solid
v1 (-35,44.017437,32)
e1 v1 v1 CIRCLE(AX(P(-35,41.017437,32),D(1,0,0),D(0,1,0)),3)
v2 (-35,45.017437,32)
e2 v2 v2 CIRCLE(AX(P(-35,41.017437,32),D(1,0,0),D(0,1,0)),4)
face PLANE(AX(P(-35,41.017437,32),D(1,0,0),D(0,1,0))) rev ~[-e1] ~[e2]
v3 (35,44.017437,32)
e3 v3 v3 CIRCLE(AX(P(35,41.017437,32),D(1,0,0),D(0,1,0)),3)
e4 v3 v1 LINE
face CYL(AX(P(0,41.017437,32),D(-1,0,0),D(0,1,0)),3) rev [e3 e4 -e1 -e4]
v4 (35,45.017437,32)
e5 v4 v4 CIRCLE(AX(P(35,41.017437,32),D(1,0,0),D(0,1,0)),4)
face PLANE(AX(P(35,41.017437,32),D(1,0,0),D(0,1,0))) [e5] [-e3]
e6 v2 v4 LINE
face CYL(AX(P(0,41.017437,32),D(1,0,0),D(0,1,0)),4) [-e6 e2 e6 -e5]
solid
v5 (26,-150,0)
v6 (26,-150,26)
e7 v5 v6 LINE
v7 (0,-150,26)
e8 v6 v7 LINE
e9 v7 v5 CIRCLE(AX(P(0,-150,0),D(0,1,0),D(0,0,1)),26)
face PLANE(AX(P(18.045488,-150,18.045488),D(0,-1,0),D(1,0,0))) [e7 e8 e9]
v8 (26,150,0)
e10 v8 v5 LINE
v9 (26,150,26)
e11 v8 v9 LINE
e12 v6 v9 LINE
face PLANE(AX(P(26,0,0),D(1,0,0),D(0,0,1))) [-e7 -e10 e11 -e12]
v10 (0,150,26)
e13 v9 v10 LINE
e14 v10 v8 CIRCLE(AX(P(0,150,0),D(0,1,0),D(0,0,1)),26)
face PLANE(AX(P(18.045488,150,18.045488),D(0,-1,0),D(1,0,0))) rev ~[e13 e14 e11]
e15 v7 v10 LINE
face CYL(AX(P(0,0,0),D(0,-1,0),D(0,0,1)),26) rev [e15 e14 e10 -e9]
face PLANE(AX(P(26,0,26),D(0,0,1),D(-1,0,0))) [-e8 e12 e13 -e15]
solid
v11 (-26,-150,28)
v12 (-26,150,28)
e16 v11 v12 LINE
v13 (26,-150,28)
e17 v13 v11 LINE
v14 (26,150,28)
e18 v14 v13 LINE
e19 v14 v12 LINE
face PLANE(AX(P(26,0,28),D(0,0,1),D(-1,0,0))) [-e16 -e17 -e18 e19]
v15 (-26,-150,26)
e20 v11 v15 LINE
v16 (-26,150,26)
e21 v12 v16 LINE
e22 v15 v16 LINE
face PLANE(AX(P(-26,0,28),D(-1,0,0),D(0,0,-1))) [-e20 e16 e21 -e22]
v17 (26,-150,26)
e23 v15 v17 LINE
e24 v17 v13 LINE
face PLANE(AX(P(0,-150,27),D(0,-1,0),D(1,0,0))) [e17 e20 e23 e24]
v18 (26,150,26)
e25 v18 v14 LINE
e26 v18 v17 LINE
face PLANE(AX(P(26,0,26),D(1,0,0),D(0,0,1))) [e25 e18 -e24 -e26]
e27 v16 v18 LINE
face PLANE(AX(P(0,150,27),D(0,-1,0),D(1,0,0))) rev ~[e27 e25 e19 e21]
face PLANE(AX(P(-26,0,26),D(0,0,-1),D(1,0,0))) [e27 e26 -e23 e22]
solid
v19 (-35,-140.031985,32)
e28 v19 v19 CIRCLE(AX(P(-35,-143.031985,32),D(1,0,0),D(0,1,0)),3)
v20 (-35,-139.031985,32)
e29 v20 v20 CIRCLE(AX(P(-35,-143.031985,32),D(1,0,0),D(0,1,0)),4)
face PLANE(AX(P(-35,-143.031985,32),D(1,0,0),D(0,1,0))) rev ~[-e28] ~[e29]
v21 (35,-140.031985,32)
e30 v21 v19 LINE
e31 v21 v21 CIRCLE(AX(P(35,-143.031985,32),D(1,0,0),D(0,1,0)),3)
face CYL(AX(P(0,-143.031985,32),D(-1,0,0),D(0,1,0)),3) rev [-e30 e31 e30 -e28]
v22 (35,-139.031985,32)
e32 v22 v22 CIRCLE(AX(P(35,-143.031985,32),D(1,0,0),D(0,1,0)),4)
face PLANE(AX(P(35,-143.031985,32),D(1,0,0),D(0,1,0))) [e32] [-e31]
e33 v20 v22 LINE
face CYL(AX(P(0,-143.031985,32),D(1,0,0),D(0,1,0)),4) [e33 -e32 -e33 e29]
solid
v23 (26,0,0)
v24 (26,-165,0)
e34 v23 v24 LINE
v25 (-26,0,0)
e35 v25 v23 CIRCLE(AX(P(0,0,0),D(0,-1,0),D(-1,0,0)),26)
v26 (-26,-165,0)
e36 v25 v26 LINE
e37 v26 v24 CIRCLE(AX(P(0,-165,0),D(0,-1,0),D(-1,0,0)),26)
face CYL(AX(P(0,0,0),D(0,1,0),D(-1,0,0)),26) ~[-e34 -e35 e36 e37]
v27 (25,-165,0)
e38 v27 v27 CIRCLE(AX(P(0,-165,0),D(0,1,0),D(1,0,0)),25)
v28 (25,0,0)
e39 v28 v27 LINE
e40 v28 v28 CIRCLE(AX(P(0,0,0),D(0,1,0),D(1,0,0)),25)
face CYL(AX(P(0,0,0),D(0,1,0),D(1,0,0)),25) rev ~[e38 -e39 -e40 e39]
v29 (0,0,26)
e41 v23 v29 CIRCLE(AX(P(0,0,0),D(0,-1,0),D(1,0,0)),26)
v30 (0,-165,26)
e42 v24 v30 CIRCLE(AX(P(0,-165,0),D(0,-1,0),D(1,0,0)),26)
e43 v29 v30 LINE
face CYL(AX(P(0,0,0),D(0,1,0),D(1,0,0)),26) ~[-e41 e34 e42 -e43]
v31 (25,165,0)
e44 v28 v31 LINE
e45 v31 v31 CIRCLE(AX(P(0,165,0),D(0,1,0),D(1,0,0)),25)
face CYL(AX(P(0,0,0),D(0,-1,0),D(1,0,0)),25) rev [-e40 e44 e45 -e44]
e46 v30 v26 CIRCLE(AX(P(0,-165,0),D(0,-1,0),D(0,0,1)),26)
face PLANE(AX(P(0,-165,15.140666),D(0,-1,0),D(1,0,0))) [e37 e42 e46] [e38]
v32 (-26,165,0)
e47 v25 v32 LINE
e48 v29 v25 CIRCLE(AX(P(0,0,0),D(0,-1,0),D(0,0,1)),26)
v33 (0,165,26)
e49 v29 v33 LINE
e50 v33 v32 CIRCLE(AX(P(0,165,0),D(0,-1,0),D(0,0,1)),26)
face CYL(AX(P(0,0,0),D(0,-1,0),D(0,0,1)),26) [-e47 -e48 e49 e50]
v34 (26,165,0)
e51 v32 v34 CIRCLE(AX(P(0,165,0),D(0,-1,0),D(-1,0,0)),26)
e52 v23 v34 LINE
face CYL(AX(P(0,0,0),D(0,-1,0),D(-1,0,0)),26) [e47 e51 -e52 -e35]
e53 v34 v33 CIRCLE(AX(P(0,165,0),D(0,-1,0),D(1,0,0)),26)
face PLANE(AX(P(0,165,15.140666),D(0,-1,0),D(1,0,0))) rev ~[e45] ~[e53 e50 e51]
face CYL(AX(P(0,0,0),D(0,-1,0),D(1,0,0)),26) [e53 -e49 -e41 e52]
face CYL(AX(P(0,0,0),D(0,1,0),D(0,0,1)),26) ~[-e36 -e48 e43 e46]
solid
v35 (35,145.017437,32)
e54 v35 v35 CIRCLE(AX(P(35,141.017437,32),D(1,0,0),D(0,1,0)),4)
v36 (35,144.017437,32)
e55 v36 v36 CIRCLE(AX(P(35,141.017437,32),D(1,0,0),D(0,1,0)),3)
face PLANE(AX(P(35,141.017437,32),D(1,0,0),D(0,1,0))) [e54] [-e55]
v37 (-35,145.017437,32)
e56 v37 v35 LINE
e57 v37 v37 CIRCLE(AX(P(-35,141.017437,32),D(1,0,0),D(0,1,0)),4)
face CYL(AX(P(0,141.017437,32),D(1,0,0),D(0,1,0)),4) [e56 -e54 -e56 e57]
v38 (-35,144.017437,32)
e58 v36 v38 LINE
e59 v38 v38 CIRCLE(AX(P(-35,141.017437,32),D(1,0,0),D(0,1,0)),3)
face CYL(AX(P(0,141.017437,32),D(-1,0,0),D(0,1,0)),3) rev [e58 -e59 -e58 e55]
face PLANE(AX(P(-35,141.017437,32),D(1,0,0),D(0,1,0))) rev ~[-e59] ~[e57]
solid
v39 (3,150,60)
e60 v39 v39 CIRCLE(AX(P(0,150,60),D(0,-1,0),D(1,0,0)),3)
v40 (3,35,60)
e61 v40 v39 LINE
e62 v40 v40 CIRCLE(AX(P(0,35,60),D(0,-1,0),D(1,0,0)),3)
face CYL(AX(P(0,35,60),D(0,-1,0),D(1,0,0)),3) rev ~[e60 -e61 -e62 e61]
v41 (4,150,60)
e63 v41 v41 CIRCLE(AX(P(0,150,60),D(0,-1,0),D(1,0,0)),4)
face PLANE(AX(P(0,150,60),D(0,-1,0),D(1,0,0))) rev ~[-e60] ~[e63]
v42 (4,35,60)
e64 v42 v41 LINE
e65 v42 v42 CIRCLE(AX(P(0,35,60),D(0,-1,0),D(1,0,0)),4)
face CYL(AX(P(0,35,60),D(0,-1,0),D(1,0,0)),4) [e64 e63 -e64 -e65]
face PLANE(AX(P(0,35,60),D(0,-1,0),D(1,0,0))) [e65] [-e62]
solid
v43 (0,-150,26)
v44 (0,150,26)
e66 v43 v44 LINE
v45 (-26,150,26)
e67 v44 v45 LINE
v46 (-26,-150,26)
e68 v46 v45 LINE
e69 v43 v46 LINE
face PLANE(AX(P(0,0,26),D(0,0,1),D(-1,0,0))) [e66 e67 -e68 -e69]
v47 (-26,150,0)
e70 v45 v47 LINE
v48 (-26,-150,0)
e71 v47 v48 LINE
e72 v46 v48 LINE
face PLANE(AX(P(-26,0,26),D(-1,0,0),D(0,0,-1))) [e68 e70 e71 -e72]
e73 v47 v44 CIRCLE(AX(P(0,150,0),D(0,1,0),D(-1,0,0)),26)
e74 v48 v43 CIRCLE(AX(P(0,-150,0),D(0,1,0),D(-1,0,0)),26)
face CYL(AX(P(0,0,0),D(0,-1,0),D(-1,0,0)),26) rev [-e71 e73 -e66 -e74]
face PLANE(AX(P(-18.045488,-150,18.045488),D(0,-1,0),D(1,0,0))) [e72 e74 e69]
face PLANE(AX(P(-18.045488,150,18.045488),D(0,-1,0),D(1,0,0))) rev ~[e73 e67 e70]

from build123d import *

# Parameters (mm, degrees)
F1_DEPTH = 165
F2_DEPTH = 150
F3_DEPTH = 150
F5_START = -35
F4_R     = 4
F4_R_2   = 3
F5_DEPTH = 115
F6_R     = 4
F6_R_2   = 3
F7_DEPTH = 35


with BuildPart() as f1:
    # F0 (on Front) → F1 (new body, symmetric)
    with BuildSketch(Plane.XZ):
        with BuildLine():
            ThreePointArc((0, 26), (-18.3847763109, 18.3847763109), (-26, 0))
            Line((-26, 0), (-25, 0))
            ThreePointArc((-25, 0), (0, 25), (25, 0))
            Line((25, 0), (26, 0))
            ThreePointArc((26, 0), (18.3847763109, 18.3847763109), (0, 26))
        make_face()
        with BuildLine():
            Line((-25, 0), (-26, 0))
            ThreePointArc((-26, 0), (0, -26), (26, 0))
            Line((26, 0), (25, 0))
            ThreePointArc((25, 0), (0, -25), (-25, 0))
        make_face()
    extrude(amount=F1_DEPTH, both=True)


with BuildPart() as f2:
    # F0 (on Front) → F2 (new body, symmetric)
    with BuildSketch(Plane.XZ):
        Polygon((-26, 26), (0, 26), (26, 26), (26, 28), (-26, 28), align=None)
    extrude(amount=F2_DEPTH, both=True)


with BuildPart() as f3:
    # F0 (on Front) → F3 (new body, symmetric)
    with BuildSketch(Plane.XZ):
        with BuildLine():
            ThreePointArc((0, 26), (18.3847763109, 18.3847763109), (26, 0))
            Line((26, 0), (26, 26))
            Line((26, 26), (0, 26))
        make_face()
    extrude(amount=F3_DEPTH, both=True)


with BuildPart() as f3b:
    # F0 (on Front) → F3, piece 2 (new body, symmetric)
    with BuildSketch(Plane.XZ):
        with BuildLine():
            Line((-26, 26), (-26, 0))
            ThreePointArc((-26, 0), (-18.3847763109, 18.3847763109), (0, 26))
            Line((0, 26), (-26, 26))
        make_face()
    extrude(amount=F3_DEPTH, both=True)


with BuildPart() as f5:
    # F4 (on Front) → F5 (new body)
    with BuildSketch(Plane.XZ.offset(F5_START)):
        with Locations((0, 60)):
            Circle(F4_R)
        with Locations((0, 60)):
            Circle(F4_R_2, mode=Mode.SUBTRACT)
    extrude(amount=-F5_DEPTH)


with BuildPart() as f7:
    # F6 (on Right) → F7 (new body, symmetric)
    with BuildSketch(Plane.YZ):
        with Locations((-143.0319845676, 32)):
            Circle(F6_R)
        with Locations((-143.0319845676, 32)):
            Circle(F6_R_2, mode=Mode.SUBTRACT)
    extrude(amount=F7_DEPTH, both=True)


with BuildPart() as f7b:
    # F6 (on Right) → F7, piece 2 (new body, symmetric)
    with BuildSketch(Plane.YZ):
        with Locations((141.0174369812, 32)):
            Circle(F6_R)
        with Locations((141.0174369812, 32)):
            Circle(F6_R_2, mode=Mode.SUBTRACT)
    extrude(amount=F7_DEPTH, both=True)


with BuildPart() as f7c:
    # F6 (on Right) → F7, piece 3 (new body, symmetric)
    with BuildSketch(Plane.YZ):
        with Locations((41.0174369812, 32)):
            Circle(F6_R)
        with Locations((41.0174369812, 32)):
            Circle(F6_R_2, mode=Mode.SUBTRACT)
    extrude(amount=F7_DEPTH, both=True)


solid = Compound([f1.part, f2.part, f3.part, f3b.part, f5.part, f7.part, f7b.part, f7c.part])
